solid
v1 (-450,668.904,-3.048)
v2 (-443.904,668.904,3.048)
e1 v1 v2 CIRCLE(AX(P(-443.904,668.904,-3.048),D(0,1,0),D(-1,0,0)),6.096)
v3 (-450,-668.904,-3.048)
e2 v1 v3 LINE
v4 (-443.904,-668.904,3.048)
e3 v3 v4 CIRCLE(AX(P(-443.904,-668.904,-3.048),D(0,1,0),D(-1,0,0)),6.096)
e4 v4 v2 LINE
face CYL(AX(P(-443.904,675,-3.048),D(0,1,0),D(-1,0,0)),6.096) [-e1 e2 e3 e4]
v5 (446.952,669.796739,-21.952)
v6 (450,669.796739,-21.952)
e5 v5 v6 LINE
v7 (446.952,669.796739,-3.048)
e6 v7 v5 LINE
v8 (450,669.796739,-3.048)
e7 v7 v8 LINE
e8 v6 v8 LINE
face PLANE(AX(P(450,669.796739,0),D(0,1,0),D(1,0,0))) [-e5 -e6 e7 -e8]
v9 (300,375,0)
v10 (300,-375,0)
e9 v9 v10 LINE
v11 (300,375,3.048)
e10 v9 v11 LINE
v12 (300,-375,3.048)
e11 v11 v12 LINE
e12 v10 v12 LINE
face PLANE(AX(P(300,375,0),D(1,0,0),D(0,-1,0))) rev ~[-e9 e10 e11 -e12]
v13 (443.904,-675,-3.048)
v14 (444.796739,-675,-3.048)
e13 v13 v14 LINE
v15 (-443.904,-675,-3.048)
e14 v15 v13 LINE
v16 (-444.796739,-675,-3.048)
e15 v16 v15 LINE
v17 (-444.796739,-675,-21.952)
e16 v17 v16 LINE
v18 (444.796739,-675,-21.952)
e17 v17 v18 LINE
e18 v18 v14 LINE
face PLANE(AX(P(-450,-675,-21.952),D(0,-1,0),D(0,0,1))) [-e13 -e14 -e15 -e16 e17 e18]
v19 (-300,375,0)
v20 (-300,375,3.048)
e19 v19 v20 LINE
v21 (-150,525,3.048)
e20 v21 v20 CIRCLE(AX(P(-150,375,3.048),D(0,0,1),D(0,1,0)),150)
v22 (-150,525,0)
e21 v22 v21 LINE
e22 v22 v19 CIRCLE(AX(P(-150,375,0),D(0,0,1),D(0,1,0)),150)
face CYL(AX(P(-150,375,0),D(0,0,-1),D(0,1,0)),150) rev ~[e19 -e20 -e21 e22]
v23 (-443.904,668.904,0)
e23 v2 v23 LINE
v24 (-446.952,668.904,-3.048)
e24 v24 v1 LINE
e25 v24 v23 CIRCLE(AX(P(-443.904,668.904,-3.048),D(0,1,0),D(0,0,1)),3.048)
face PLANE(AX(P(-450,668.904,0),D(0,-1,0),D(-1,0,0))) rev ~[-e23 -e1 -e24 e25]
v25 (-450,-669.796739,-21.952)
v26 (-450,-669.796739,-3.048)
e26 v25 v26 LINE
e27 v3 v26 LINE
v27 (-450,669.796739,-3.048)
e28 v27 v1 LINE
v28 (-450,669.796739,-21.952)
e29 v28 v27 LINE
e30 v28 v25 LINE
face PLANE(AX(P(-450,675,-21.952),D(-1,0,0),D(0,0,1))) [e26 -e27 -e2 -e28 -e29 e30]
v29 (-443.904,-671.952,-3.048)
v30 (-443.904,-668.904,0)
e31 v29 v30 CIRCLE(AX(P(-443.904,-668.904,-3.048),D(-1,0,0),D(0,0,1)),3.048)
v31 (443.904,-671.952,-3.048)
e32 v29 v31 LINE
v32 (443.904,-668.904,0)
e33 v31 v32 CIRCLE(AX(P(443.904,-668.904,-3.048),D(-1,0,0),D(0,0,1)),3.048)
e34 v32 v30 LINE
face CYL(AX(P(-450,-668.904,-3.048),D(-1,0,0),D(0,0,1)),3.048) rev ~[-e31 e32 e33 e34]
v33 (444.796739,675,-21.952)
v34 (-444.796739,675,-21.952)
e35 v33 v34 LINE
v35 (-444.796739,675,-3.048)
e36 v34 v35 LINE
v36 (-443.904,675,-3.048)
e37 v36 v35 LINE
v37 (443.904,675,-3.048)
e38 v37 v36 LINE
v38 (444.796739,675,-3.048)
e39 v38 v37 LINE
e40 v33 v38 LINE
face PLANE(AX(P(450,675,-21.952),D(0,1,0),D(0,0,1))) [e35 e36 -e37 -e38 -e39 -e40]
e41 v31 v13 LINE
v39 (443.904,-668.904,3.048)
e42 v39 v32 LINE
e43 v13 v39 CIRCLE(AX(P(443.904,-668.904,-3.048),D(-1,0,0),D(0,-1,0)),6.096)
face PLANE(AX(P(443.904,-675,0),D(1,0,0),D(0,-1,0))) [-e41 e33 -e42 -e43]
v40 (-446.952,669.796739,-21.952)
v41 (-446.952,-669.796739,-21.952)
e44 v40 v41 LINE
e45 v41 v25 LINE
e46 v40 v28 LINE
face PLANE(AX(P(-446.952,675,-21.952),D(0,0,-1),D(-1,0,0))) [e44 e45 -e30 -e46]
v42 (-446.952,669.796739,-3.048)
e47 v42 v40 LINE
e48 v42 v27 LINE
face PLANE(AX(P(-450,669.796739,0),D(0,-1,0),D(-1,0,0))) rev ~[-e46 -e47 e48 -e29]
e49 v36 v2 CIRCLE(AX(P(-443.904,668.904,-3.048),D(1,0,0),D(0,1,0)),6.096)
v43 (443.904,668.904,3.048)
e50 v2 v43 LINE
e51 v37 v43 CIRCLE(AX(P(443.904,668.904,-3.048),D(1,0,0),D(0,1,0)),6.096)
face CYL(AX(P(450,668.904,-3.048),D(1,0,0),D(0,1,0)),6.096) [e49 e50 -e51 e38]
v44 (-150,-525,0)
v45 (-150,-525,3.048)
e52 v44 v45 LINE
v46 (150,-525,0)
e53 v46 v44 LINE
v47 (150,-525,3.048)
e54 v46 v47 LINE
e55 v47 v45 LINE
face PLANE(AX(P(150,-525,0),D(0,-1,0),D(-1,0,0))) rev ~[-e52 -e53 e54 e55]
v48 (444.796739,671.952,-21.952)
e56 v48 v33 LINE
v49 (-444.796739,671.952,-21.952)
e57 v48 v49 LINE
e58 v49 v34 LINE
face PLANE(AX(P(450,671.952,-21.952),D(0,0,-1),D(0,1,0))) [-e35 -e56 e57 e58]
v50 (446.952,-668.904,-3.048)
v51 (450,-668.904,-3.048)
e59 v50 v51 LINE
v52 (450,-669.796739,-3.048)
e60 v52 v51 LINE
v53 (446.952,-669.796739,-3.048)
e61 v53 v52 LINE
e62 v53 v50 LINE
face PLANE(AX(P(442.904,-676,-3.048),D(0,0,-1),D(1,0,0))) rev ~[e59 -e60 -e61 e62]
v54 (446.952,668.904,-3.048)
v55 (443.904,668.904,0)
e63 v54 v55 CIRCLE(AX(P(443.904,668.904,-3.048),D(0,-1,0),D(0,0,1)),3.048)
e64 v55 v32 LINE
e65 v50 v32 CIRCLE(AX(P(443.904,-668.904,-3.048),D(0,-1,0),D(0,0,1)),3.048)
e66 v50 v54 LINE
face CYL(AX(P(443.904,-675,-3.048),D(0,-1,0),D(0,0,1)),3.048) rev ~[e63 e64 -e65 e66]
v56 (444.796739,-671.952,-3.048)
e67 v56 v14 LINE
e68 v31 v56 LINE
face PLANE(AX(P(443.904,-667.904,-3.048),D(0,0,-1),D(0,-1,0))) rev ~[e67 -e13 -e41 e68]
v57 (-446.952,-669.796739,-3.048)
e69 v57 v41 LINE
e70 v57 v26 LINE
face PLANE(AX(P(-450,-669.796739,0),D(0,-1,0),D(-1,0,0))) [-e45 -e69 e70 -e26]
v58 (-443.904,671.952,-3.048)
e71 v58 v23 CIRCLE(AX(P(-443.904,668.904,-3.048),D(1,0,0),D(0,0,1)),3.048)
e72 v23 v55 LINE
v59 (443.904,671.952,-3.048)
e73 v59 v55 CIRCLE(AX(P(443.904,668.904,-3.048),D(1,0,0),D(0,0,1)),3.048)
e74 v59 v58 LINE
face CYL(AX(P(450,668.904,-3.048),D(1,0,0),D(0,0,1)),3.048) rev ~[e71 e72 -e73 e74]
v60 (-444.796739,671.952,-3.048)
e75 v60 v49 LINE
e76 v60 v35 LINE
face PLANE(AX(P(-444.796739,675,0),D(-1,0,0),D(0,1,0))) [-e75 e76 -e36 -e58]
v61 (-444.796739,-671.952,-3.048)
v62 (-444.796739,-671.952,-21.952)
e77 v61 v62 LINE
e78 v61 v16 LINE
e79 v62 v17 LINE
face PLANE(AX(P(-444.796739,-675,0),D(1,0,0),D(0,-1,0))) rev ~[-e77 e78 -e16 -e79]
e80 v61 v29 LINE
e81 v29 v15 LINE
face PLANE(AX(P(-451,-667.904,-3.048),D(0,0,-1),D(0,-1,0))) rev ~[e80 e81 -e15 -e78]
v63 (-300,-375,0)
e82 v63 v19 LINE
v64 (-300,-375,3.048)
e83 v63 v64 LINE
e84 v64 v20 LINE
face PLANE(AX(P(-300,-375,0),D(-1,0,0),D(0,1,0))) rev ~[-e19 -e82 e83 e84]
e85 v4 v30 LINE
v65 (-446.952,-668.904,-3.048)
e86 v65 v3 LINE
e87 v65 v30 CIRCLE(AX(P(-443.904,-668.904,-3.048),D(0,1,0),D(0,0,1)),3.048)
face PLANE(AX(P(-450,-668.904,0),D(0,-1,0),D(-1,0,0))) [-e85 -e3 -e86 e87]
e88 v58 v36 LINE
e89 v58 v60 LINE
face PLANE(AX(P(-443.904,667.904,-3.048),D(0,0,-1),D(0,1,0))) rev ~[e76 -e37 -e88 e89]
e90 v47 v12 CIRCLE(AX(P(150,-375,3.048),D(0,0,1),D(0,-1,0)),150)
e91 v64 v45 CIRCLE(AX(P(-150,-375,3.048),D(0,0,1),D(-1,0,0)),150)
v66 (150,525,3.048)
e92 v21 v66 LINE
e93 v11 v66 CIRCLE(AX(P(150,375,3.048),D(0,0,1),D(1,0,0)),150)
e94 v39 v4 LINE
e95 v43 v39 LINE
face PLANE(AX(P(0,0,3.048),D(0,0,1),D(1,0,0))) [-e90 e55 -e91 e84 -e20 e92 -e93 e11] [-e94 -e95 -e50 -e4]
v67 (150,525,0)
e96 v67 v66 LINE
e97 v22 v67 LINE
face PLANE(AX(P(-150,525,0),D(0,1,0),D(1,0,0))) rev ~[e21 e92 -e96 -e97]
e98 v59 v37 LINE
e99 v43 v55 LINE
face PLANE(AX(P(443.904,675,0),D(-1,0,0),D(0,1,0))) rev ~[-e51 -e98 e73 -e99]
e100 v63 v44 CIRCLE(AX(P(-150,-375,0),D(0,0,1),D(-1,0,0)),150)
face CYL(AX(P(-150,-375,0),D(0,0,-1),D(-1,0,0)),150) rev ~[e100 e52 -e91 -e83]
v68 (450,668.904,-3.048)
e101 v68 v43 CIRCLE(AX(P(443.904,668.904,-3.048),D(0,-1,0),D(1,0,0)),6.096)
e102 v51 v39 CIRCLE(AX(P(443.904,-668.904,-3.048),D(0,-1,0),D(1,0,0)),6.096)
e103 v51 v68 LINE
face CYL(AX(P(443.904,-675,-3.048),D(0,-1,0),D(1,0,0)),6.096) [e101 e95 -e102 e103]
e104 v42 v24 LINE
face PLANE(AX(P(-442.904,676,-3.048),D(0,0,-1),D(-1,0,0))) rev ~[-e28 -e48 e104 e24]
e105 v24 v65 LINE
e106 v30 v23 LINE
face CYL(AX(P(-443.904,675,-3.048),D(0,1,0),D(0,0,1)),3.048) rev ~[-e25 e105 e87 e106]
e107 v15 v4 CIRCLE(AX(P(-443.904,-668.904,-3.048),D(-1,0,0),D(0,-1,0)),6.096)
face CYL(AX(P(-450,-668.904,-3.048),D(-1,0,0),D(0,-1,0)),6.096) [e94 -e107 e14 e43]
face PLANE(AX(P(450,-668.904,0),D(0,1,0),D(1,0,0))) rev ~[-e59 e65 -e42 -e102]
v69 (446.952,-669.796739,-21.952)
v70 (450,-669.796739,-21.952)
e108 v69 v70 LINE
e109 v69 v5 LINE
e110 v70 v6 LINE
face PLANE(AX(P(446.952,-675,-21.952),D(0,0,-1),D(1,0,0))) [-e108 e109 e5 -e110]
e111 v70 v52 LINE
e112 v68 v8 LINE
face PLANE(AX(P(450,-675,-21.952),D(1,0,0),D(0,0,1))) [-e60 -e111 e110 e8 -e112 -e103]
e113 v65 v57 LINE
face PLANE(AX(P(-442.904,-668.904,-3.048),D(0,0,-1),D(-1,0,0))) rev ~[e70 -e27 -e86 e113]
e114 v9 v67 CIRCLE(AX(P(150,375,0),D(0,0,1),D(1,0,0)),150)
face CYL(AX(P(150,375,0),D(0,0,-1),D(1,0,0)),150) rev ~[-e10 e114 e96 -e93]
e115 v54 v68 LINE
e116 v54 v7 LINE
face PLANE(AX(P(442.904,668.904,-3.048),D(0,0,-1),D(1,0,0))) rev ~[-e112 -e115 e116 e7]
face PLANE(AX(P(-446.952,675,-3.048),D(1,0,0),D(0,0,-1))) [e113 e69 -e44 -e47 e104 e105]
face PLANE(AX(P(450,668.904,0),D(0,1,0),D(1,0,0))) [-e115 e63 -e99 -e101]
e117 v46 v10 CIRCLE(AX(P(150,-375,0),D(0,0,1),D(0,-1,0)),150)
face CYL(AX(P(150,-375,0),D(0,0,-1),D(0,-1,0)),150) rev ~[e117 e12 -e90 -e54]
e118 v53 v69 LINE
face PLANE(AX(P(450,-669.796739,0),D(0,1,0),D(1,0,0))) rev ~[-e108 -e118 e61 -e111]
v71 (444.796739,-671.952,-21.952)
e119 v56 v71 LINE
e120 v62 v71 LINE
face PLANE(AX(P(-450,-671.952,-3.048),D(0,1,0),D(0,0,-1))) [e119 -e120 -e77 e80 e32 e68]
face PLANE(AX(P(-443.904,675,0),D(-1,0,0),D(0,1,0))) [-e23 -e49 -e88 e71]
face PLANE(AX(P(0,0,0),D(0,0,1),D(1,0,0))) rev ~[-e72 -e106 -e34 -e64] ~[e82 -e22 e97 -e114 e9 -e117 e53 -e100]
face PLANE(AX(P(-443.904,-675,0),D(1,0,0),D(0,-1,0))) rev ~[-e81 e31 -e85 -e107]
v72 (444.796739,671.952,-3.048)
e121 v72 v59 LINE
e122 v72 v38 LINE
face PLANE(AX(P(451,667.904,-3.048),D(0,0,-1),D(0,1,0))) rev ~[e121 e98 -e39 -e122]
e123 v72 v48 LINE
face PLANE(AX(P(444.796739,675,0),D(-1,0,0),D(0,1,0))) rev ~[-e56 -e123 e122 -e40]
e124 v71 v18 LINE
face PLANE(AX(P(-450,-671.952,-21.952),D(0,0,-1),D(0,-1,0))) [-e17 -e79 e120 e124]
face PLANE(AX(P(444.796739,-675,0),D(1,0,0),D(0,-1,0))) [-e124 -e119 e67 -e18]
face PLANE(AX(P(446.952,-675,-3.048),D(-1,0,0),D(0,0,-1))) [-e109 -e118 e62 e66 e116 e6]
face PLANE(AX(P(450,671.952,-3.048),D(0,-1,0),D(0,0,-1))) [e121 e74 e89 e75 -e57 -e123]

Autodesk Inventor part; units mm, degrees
ref_plane "YZ Plane" through (0, 0, 0) normal (1, 0, 0) x (0, 1, 0)
ref_plane "XZ Plane" through (0, 0, 0) normal (0, 1, 0) x (-1, 0, 0)
ref_plane "XY Plane" through (0, 0, 0) normal (0, 0, 1) x (1, 0, 0)
sketch "Sketch1" plane through (0, 0, 0) normal (0, 0, 1) x (1, 0, 0)
  line L0 (-450, -675) -> (450, -675)
  line L1 (450, -675) -> (450, 675)
  line L2 (450, 675) -> (-450, 675)
  line L3 (-450, 675) -> (-450, -675)
  line L4 (-450, -675) -> (450, 675) construction
  line L5 (450, -675) -> (-450, 675) construction
  line L6 (-150, 525) -> (150, 525)
  line L7 (300, 375) -> (300, -375)
  line L8 (150, -525) -> (-150, -525)
  line L9 (-300, -375) -> (-300, 375)
  arc A0 (300, 375) -> (150, 525) centre (150, 375) ccw
  arc A1 (-150, 525) -> (-300, 375) centre (-150, 375) ccw
  arc A2 (-300, -375) -> (-150, -525) centre (-150, -375) ccw
  arc A3 (150, -525) -> (300, -375) centre (150, -375) ccw
  point P0 (0, 0)
  dimension "d0" = 900
  dimension "d1" = 1350
  dimension "d13" = 150
  dimension "d14" = 150
  dimension "d15" = 150
  dimension "d16" = 150
  dimension "d17" = 150
extrude "Plate3" add sketch "Sketch1" along normal blind 3.048
sketch "Sketch3" plane through (450, 671.952, 3.048) normal (0, 1, 0) x (-1, 0, 0)
  line L0 (900, 0) -> (0, 0)
  line L1 (0, 0) -> (0, -25)
  line L2 (0, -25) -> (900, -25)
  line L3 (900, -25) -> (900, 0)
edge flange "Flange2" height 25 angle 90 thickness 3.048 bend radius 3.048 thickness toward (0, 1, 0) relief tear relief width 3.048 relief depth 1.524 corner gap 3.048 corner form 2 edges at (0, 675, 0) (-450, 0, 0) (450, 0, 0) (0, -675, 0) wall of the first edge with corners at (-450, 671.952, 3.048) (450, 671.952, 3.048) (450, 671.952, -21.952) (-450, 671.952, -21.952)
bend "Bend2"
corner "Corner2"
equation "\"d18\" = Thickness"
equation "\"d19\" = BendReliefWidth"
equation "\"d20\" = BendReliefDepth"
equation "\"d21\" = MinimumRemnant"
equation "\"d22\" = TransitionRadius"
equation "\"d25\" = BendRadius"
equation "\"d26\" = CornerReliefSize"
equation "\"d27\" = GapSize"
equation "\"d28\" = JacobiRadiusSize"
equation "\"BendRadius\" = Thickness"
equation "\"BendReliefWidth\" = Thickness"
equation "\"BendReliefDepth\" = 0.5 * Thickness"
equation "\"CornerReliefSize\" = 4 * Thickness"
equation "\"MinimumRemnant\" = 2 * Thickness"
equation "\"TransitionRadius\" = BendRadius"
equation "\"JacobiRadiusSize\" = BendRadius"
equation "\"GapSize\" = Thickness"
equation "\"Space5\" = 0"
equation "\"Space6\" = 0"
equation "\"Space7\" = 0"
equation "\"Thickness\" = 3.048"
properties part number "TapaCentral"
